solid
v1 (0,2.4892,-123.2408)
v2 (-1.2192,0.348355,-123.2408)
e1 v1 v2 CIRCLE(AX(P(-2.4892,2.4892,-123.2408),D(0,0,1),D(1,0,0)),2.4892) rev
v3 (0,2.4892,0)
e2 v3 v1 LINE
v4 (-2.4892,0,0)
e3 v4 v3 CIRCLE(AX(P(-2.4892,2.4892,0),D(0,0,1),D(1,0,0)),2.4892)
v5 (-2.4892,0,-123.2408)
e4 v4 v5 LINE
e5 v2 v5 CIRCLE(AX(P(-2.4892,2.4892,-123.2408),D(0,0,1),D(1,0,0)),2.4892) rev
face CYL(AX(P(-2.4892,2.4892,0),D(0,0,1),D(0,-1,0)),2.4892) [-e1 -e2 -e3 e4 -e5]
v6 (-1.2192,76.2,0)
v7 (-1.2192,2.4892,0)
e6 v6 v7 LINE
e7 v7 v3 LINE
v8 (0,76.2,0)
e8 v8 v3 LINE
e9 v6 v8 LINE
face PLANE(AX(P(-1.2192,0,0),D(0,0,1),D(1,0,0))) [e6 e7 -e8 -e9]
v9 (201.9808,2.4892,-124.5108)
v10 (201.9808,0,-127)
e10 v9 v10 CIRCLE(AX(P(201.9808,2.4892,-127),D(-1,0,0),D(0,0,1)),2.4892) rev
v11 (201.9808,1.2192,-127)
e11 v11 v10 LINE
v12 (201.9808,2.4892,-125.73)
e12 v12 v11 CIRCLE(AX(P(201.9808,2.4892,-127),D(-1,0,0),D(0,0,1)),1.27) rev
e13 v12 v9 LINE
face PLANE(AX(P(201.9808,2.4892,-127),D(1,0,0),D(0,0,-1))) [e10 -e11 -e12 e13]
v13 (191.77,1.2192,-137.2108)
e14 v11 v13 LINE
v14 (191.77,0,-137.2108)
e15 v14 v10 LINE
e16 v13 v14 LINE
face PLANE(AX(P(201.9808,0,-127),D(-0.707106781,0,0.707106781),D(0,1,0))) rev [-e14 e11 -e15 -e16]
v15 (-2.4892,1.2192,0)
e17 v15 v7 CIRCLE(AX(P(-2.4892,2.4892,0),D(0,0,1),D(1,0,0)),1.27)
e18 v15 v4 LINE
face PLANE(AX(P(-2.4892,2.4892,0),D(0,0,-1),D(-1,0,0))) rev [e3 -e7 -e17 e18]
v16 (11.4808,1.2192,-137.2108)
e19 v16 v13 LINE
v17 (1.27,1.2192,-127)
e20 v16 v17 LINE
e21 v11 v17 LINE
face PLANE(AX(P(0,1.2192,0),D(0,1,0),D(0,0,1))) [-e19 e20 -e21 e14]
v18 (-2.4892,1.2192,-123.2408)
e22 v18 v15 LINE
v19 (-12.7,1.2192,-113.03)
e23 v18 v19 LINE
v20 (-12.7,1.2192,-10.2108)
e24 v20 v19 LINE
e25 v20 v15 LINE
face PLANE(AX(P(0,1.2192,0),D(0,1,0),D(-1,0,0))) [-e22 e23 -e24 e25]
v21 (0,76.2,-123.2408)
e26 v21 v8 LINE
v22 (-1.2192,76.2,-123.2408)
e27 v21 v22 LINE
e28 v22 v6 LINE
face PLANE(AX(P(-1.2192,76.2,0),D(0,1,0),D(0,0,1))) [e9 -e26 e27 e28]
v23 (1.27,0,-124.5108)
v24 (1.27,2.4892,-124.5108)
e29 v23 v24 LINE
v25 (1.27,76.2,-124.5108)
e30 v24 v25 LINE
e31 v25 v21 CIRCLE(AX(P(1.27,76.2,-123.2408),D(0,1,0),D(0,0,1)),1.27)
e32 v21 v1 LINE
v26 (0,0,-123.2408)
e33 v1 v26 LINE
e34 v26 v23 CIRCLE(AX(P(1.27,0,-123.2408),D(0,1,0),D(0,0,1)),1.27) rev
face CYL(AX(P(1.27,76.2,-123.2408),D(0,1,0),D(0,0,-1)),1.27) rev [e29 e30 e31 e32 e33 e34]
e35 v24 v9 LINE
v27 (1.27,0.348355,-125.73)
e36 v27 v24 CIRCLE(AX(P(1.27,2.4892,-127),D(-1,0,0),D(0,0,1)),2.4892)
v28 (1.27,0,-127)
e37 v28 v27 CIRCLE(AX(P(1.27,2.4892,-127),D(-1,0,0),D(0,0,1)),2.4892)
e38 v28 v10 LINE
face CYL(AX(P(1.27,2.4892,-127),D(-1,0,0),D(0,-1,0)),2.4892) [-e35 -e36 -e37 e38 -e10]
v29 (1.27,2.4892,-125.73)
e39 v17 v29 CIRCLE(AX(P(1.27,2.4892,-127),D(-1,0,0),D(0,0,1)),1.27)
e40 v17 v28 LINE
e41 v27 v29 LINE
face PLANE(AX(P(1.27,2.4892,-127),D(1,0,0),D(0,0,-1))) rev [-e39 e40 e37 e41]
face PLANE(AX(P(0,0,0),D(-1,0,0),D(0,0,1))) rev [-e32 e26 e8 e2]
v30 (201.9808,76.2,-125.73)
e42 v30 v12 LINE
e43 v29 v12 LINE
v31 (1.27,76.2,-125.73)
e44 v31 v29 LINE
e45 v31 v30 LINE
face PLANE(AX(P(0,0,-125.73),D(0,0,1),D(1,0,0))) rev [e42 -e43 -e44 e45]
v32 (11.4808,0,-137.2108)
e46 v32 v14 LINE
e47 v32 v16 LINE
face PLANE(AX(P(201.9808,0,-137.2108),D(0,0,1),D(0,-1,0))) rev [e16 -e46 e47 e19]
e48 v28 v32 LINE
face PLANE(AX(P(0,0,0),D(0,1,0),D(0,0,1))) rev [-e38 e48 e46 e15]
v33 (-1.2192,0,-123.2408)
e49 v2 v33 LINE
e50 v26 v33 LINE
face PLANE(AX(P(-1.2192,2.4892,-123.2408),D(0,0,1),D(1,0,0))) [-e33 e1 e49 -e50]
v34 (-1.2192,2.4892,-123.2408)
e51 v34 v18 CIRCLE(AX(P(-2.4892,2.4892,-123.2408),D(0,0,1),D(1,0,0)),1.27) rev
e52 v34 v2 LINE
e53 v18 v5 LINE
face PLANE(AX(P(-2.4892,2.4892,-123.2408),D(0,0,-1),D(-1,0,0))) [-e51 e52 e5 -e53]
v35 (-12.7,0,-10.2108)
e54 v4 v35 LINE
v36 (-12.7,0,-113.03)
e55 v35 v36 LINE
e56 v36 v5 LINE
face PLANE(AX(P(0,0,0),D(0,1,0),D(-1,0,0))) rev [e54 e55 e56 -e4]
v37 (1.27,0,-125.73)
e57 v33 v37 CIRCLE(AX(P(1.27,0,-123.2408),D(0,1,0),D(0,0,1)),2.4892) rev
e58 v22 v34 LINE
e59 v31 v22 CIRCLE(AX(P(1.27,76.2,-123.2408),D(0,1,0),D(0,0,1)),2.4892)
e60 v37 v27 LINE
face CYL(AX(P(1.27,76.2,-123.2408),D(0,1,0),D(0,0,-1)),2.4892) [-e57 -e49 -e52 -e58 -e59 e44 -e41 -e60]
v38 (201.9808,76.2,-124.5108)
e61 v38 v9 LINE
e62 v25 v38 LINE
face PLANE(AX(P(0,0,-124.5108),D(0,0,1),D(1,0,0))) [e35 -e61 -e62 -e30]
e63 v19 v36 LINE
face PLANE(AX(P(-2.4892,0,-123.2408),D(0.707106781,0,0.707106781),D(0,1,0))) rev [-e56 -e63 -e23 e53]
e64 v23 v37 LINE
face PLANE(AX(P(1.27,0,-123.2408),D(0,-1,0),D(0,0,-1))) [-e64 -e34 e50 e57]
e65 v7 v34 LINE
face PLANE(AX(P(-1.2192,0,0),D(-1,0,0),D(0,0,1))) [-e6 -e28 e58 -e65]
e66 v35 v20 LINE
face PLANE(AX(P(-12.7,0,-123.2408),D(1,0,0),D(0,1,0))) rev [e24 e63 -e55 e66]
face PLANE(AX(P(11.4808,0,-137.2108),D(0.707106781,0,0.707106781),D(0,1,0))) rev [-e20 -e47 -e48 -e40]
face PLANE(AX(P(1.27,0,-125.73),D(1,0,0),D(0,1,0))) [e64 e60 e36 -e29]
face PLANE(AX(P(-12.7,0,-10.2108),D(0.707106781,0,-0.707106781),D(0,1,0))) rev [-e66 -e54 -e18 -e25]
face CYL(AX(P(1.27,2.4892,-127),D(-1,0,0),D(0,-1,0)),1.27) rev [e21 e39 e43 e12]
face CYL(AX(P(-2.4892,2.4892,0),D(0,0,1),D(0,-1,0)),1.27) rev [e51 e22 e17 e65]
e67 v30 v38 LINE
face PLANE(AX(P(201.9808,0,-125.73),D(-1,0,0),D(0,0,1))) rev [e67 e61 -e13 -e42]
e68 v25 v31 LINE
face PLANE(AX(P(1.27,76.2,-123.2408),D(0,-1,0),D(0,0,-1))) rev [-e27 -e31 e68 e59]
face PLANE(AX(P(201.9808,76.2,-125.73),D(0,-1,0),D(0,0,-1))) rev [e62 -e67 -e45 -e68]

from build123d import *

# Parameters (mm, degrees)
SKETCH1_W                    = 125.73
SKETCH1_H                    = 76.2
BASE_FLANGE1_DEPTH           = 1.2192
EDGE_FLANGE1_STRIP_W         = 7.4168
EDGE_FLANGE1_STRIP_H         = 1.2192
EDGE_FLANGE1_STRIP_CUT_DEPTH = 76.2
EDGE_FLANGE1_DEPTH           = 76.2
EDGE_FLANGE2_STRIP_W         = 7.4168
EDGE_FLANGE2_STRIP_H         = 1.2192
EDGE_FLANGE2_STRIP_CUT_DEPTH = 123.2408
EDGE_FLANGE2_DEPTH           = 123.2408
EDGE_FLANGE3_STRIP_W         = 7.4168
EDGE_FLANGE3_STRIP_H         = 1.2192
EDGE_FLANGE3_STRIP_CUT_DEPTH = 200.7108
EDGE_FLANGE3_DEPTH           = 200.7108
BREAK_CORNER5_START          = -96.12466152
BREAK_CORNER5_OUTLINE_W      = 143.62455456
BREAK_CORNER5_OUTLINE_H      = 4
BREAK_CORNER5_DEPTH          = 7.220125921
BREAK_CORNER5_START_2        = 38.579180296
BREAK_CORNER5_2_OUTLINE_W    = 8.37544544
BREAK_CORNER5_2_OUTLINE_H    = 4
BREAK_CORNER5_2_DEPTH        = 14.440251843
BREAK_CORNER6_START          = -96.12466152
BREAK_CORNER6_OUTLINE_W      = 88.7601302
BREAK_CORNER6_OUTLINE_H      = 4
BREAK_CORNER6_DEPTH          = 7.220125921
BREAK_CORNER6_START_2        = -16.200382042
BREAK_CORNER6_2_OUTLINE_W    = 8.2398698
BREAK_CORNER6_2_OUTLINE_H    = 4
BREAK_CORNER6_2_DEPTH        = 14.440251842


# Read off the part's stored shape, not the designer's step: Break-Corner5, Break-Corner6
# Sheet-metal steps are written as plain solids
with BuildPart() as part:
    # Sketch1 → Base-Flange1 (new body)
    with BuildSketch(Plane(origin=(0, 0, 0), x_dir=(0, 0, -1), z_dir=(1, 0, 0))):
        with Locations((62.865, 38.1)):
            Rectangle(SKETCH1_W, SKETCH1_H)
    extrude(amount=-BASE_FLANGE1_DEPTH)

    # Edge-Flange1 strip (across the edge) → Edge-Flange1 strip cut (cut)
    with BuildSketch(Plane(origin=(0, 0, -125.73), x_dir=(0, 0, 1), z_dir=(0, 1, 0))):
        with Locations((-1.2192, -0.6096)):
            Rectangle(EDGE_FLANGE1_STRIP_W, EDGE_FLANGE1_STRIP_H)
    extrude(amount=EDGE_FLANGE1_STRIP_CUT_DEPTH, mode=Mode.SUBTRACT)

    # Edge-Flange1 section (across the edge) → Edge-Flange1 (add)
    with BuildSketch(Plane(origin=(0, 0, -125.73), x_dir=(0, 0, 1), z_dir=(0, 1, 0))):
        with BuildLine():
            Line((0, 1.27), (0, 201.9808))
            Line((0, 201.9808), (1.2192, 201.9808))
            Line((1.2192, 201.9808), (1.2192, 1.27))
            ThreePointArc((1.2192, 1.27), (1.591174388, 0.371974388), (2.4892, 0))
            Line((2.4892, 0), (2.4892, -1.2192))
            ThreePointArc((2.4892, -1.2192), (0.7290698, -0.4901302), (0, 1.27))
        make_face()
    extrude(amount=EDGE_FLANGE1_DEPTH)

    # Edge-Flange2 strip (across the edge) → Edge-Flange2 strip cut (cut)
    with BuildSketch(Plane(origin=(-1.2192, 0, -123.2408), x_dir=(0, 1, 0), z_dir=(0, 0, 1))):
        with Locations((-1.2192, -0.6096)):
            Rectangle(EDGE_FLANGE2_STRIP_W, EDGE_FLANGE2_STRIP_H)
    extrude(amount=EDGE_FLANGE2_STRIP_CUT_DEPTH, mode=Mode.SUBTRACT)

    # Edge-Flange2 section (across the edge) → Edge-Flange2 (add)
    with BuildSketch(Plane(origin=(-1.2192, 0, -123.2408), x_dir=(0, 1, 0), z_dir=(0, 0, 1))):
        with BuildLine():
            Line((0, 1.27), (0, 11.4808))
            Line((0, 11.4808), (1.2192, 11.4808))
            Line((1.2192, 11.4808), (1.2192, 1.27))
            ThreePointArc((1.2192, 1.27), (1.591174388, 0.371974388), (2.4892, 0))
            Line((2.4892, 0), (2.4892, -1.2192))
            ThreePointArc((2.4892, -1.2192), (0.7290698, -0.4901302), (0, 1.27))
        make_face()
    extrude(amount=EDGE_FLANGE2_DEPTH)

    # Edge-Flange3 strip (across the edge) → Edge-Flange3 strip cut (cut)
    with BuildSketch(Plane(origin=(201.9808, 0, -125.73), x_dir=(0, 1, 0), z_dir=(-1, 0, 0))):
        with Locations((-1.2192, -0.6096)):
            Rectangle(EDGE_FLANGE3_STRIP_W, EDGE_FLANGE3_STRIP_H)
    extrude(amount=EDGE_FLANGE3_STRIP_CUT_DEPTH, mode=Mode.SUBTRACT)

    # Edge-Flange3 section (across the edge) → Edge-Flange3 (add)
    with BuildSketch(Plane(origin=(201.9808, 0, -125.73), x_dir=(0, 1, 0), z_dir=(-1, 0, 0))):
        with BuildLine():
            Line((0, 1.27), (0, 11.4808))
            Line((0, 11.4808), (1.2192, 11.4808))
            Line((1.2192, 11.4808), (1.2192, 1.27))
            ThreePointArc((1.2192, 1.27), (1.591174388, 0.371974388), (2.4892, 0))
            Line((2.4892, 0), (2.4892, -1.2192))
            ThreePointArc((2.4892, -1.2192), (0.7290698, -0.4901302), (0, 1.27))
        make_face()
    extrude(amount=EDGE_FLANGE3_DEPTH)

    # Break-Corner5 outline → Break-Corner5 (cut)
    with BuildSketch(Plane(origin=(0, 0, 0), x_dir=(0.707106781186546, 0, -0.707106781186549), z_dir=(0.707106781186549, 0, 0.707106781186546)).offset(BREAK_CORNER5_START)):
        with Locations((160.81227728, 1)):
            Rectangle(BREAK_CORNER5_OUTLINE_W, BREAK_CORNER5_OUTLINE_H)
    extrude(amount=BREAK_CORNER5_DEPTH, mode=Mode.SUBTRACT)

    # Break-Corner5 2 outline → Break-Corner5 2 (cut)
    with BuildSketch(Plane(origin=(0, 0, 0), x_dir=(0.707106781186546, 0, -0.707106781186549), z_dir=(0.707106781186549, 0, 0.707106781186546)).offset(BREAK_CORNER5_START_2)):
        with Locations((236.81227728, 1)):
            Rectangle(BREAK_CORNER5_2_OUTLINE_W, BREAK_CORNER5_2_OUTLINE_H)
    extrude(amount=BREAK_CORNER5_2_DEPTH, mode=Mode.SUBTRACT)

    # Break-Corner6 outline → Break-Corner6 (cut)
    with BuildSketch(Plane(origin=(0, 0, 0), x_dir=(0.7071067811865471, 0, -0.707106781186548), z_dir=(0.707106781186548, 0, 0.707106781186547)).offset(BREAK_CORNER6_START)):
        with Locations((42.6199349, 1)):
            Rectangle(BREAK_CORNER6_OUTLINE_W, BREAK_CORNER6_OUTLINE_H)
    extrude(amount=BREAK_CORNER6_DEPTH, mode=Mode.SUBTRACT)

    # Break-Corner6 2 outline → Break-Corner6 2 (cut)
    with BuildSketch(Plane(origin=(0, 0, 0), x_dir=(0.7071067811865471, 0, -0.707106781186548), z_dir=(0.707106781186548, 0, 0.707106781186547)).offset(BREAK_CORNER6_START_2)):
        with Locations((-5.8800651, 1)):
            Rectangle(BREAK_CORNER6_2_OUTLINE_W, BREAK_CORNER6_2_OUTLINE_H)
    extrude(amount=BREAK_CORNER6_2_DEPTH, mode=Mode.SUBTRACT)


solid = part.part
